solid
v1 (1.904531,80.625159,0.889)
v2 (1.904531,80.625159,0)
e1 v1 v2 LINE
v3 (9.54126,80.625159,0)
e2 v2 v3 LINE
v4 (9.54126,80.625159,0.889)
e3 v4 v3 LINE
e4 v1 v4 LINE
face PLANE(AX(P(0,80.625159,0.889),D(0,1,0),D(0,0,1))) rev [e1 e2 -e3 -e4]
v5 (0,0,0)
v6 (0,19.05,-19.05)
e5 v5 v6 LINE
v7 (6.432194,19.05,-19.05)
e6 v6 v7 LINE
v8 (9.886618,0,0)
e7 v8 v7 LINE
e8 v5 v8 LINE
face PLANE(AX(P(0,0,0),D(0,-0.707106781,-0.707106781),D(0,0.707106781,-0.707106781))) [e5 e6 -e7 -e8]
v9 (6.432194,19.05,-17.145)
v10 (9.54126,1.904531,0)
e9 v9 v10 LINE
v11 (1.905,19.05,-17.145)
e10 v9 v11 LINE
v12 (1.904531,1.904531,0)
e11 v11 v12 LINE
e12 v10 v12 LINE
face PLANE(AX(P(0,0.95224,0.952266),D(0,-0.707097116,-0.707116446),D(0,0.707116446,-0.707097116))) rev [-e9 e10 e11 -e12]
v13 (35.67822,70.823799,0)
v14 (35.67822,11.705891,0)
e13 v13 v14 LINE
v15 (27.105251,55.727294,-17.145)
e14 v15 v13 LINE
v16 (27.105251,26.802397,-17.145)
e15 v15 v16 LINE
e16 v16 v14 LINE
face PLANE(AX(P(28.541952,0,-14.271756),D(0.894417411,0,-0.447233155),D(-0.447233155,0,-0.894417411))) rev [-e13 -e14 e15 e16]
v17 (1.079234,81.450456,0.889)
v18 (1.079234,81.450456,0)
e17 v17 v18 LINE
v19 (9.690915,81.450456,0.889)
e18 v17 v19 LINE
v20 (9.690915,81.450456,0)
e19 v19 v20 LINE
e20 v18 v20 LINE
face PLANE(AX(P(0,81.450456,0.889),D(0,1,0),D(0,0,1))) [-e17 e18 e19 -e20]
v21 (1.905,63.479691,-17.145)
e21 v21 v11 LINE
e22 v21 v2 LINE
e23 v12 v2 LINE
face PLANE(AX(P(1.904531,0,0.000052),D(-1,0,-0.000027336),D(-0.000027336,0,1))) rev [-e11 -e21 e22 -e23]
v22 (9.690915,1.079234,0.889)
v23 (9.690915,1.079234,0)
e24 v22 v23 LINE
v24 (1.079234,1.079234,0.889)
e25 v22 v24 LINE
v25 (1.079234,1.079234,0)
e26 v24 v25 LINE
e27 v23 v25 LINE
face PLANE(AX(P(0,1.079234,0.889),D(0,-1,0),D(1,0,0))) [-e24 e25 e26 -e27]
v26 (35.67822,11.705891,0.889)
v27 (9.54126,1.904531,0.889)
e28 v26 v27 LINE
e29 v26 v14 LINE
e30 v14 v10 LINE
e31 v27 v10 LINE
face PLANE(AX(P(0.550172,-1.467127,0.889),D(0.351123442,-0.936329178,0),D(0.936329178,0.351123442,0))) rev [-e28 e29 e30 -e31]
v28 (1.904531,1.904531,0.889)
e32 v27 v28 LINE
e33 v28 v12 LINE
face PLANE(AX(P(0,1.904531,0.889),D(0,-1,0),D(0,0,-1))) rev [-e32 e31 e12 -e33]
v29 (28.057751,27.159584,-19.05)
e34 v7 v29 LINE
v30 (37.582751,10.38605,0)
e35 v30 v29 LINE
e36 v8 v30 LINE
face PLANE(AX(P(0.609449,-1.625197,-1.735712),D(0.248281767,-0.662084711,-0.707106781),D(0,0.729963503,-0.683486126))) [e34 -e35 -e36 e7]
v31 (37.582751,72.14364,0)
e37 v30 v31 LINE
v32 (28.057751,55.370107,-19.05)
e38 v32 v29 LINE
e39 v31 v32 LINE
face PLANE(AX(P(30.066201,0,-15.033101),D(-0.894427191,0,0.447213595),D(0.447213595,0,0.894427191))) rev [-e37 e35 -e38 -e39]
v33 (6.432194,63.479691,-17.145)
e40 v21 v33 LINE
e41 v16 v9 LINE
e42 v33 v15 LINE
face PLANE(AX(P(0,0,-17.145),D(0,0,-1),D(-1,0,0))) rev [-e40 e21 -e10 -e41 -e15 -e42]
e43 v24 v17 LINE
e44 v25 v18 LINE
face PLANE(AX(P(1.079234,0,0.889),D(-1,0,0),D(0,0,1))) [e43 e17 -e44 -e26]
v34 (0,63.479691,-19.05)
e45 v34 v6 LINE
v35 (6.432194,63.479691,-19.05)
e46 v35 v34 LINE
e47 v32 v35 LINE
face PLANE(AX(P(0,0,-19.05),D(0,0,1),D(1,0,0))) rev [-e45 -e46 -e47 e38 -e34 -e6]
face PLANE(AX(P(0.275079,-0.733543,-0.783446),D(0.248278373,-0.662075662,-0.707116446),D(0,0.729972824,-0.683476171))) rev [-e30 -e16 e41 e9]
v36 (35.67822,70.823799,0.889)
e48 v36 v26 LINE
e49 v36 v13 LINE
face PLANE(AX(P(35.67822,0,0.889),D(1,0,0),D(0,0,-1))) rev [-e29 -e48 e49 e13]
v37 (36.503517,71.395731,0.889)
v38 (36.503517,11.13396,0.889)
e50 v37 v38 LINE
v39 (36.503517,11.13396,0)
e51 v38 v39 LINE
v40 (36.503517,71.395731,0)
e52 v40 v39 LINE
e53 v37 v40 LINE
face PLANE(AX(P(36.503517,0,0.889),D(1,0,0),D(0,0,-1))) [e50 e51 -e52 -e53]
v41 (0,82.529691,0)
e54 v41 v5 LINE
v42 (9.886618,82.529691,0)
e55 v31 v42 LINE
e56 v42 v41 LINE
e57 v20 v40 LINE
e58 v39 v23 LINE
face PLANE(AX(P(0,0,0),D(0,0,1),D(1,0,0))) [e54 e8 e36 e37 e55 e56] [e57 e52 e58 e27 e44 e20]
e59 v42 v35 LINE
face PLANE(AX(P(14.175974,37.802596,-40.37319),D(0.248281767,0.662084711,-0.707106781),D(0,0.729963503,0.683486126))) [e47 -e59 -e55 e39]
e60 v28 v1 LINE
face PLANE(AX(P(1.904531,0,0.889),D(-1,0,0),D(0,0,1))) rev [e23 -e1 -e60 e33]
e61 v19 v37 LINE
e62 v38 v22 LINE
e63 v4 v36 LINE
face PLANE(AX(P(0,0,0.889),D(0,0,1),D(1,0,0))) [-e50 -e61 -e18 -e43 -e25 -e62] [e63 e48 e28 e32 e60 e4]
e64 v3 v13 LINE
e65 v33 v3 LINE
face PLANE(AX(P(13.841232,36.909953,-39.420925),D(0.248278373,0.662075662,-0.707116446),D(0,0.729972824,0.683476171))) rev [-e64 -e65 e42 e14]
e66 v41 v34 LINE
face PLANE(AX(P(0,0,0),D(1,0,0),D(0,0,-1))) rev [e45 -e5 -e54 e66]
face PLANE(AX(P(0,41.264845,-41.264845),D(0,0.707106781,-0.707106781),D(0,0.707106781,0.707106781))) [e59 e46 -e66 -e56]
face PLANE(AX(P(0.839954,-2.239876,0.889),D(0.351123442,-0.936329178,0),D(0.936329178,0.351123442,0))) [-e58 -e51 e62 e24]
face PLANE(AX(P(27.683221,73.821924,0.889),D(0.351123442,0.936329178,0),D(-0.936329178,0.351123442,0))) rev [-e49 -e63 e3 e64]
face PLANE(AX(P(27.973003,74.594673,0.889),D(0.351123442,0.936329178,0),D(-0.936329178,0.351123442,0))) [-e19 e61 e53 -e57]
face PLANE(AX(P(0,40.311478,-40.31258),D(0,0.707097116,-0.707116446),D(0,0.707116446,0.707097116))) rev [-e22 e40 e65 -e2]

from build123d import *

# Parameters (mm, degrees)
BOSS_EXTRUDE1_DEPTH = 0.889
LOFT2_DEPTH         = 82.529690579
LOFT2_START         = 4.746357977
LOFT2_2_DEPTH       = 59.253642023
LOFT2_START_2       = -13.360997113
LOFT2_3_DEPTH       = 13.360997113
LOFT2_START_3       = -53.387286303
LOFT2_4_DEPTH       = 59.387286303
LOFT2_START_4       = -71.244406959
LOFT2_5_DEPTH       = 13.360997113


with BuildPart() as part:
    # Sketch2 → Boss-Extrude1 (new body)
    with BuildSketch(Plane.XY):
        Polygon((1.079234415, 1.079234415), (1.079234415, 81.450456164), (9.69091533, 81.450456164), (36.503516987, 71.395730542), (36.503516987, 11.133960037), (9.69091533, 1.079234415), align=None)
        Polygon((1.904531321, 1.904531321), (1.904531321, 80.625159258), (9.54126046, 80.625159258), (35.678220081, 70.8237994), (35.678220081, 11.705891179), (9.54126046, 1.904531321), align=None, mode=Mode.SUBTRACT)
    extrude(amount=BOSS_EXTRUDE1_DEPTH)

    # Loft2: read off the stored shape, not the designer's step
    # Loft2 outline → Loft2 (add)
    with BuildSketch(Plane(origin=(0, 0, 0), x_dir=(1, 0, 0), z_dir=(0, 1, 0))):
        Polygon((0, 0), (37.582751402, 0), (28.057751402, 19.05), (0, 19.05), align=None)
    extrude(amount=LOFT2_DEPTH)

    # Loft2 2 outline → Loft2 2 (cut)
    with BuildSketch(Plane(origin=(0, 0, 0), x_dir=(0.9918794395900915, -0.08993102167340751, -0.08993102167340765), z_dir=(0.12718167052860177, 0.7013646778536657, 0.7013646778536667)).offset(LOFT2_START)):
        Polygon((2.384353581, 58.357303857), (30.789607102, 51.013257415), (37, 49.40758916), (37, 73), (-9, 73), (-9, 58.357303857), align=None)
    extrude(amount=LOFT2_2_DEPTH, mode=Mode.SUBTRACT)

    # Loft2 3 outline → Loft2 3 (cut)
    with BuildSketch(Plane(origin=(0, 0, 0), x_dir=(0.9918794395900915, -0.08993102167340751, -0.08993102167340765), z_dir=(0.12718167052860177, 0.7013646778536657, 0.7013646778536667)).offset(LOFT2_START_2)):
        Polygon((37, 49.40758916), (30.789607102, 51.013257415), (2.384353581, 58.357303857), (-9, 58.357303857), (-9, 1), (37, 1), align=None)
    extrude(amount=LOFT2_3_DEPTH, mode=Mode.SUBTRACT)

    # Loft2 4 outline → Loft2 4 (cut)
    with BuildSketch(Plane(origin=(0, 0, 0), x_dir=(0.9918794395900911, 0.08993102167341009, -0.08993102167341009), z_dir=(0.12718167052860532, -0.7013646778536659, 0.7013646778536659)).offset(LOFT2_START_3)):
        Polygon((38.211586494, 7.344046443), (9.806332973, 0), (-1, 0), (-1, -15), (45, -15), (45, 9.099159244), align=None)
    extrude(amount=LOFT2_4_DEPTH, mode=Mode.SUBTRACT)

    # Loft2 5 outline → Loft2 5 (cut)
    with BuildSketch(Plane(origin=(0, 0, 0), x_dir=(0.9918794395900911, 0.08993102167341009, -0.08993102167341009), z_dir=(0.12718167052860532, -0.7013646778536659, 0.7013646778536659)).offset(LOFT2_START_4)):
        Polygon((-1, 0), (9.806332973, 0), (38.211586494, 7.344046443), (45, 9.099159244), (45, 58), (-1, 58), align=None)
    extrude(amount=LOFT2_5_DEPTH, mode=Mode.SUBTRACT)

    # Sketch5 → section 0 of cut_loft2
    with BuildSketch(Plane.XY.offset(-17.145), mode=Mode.PRIVATE) as cut_loft2_s0:
        with BuildLine():
            Line((27.105251402, 26.8023965), (6.432194068, 19.05))
            Line((6.432194068, 19.05), (1.905, 19.05))
            Line((1.905, 19.05), (1.905, 63.479690579))
            Line((1.905, 63.479690579), (6.432194068, 63.479690579))
            Line((6.432194068, 63.479690579), (27.105251402, 55.727294079))
            Line((27.105251402, 55.727294079), (27.105251402, 26.8023965))
        make_face()
    # loft up to a face of the part (cut_loft2)
    loft([cut_loft2_s0.sketch, part.faces().sort_by_distance((17.91973196, 41.264845289, 0))[0]], mode=Mode.SUBTRACT)


solid = part.part
